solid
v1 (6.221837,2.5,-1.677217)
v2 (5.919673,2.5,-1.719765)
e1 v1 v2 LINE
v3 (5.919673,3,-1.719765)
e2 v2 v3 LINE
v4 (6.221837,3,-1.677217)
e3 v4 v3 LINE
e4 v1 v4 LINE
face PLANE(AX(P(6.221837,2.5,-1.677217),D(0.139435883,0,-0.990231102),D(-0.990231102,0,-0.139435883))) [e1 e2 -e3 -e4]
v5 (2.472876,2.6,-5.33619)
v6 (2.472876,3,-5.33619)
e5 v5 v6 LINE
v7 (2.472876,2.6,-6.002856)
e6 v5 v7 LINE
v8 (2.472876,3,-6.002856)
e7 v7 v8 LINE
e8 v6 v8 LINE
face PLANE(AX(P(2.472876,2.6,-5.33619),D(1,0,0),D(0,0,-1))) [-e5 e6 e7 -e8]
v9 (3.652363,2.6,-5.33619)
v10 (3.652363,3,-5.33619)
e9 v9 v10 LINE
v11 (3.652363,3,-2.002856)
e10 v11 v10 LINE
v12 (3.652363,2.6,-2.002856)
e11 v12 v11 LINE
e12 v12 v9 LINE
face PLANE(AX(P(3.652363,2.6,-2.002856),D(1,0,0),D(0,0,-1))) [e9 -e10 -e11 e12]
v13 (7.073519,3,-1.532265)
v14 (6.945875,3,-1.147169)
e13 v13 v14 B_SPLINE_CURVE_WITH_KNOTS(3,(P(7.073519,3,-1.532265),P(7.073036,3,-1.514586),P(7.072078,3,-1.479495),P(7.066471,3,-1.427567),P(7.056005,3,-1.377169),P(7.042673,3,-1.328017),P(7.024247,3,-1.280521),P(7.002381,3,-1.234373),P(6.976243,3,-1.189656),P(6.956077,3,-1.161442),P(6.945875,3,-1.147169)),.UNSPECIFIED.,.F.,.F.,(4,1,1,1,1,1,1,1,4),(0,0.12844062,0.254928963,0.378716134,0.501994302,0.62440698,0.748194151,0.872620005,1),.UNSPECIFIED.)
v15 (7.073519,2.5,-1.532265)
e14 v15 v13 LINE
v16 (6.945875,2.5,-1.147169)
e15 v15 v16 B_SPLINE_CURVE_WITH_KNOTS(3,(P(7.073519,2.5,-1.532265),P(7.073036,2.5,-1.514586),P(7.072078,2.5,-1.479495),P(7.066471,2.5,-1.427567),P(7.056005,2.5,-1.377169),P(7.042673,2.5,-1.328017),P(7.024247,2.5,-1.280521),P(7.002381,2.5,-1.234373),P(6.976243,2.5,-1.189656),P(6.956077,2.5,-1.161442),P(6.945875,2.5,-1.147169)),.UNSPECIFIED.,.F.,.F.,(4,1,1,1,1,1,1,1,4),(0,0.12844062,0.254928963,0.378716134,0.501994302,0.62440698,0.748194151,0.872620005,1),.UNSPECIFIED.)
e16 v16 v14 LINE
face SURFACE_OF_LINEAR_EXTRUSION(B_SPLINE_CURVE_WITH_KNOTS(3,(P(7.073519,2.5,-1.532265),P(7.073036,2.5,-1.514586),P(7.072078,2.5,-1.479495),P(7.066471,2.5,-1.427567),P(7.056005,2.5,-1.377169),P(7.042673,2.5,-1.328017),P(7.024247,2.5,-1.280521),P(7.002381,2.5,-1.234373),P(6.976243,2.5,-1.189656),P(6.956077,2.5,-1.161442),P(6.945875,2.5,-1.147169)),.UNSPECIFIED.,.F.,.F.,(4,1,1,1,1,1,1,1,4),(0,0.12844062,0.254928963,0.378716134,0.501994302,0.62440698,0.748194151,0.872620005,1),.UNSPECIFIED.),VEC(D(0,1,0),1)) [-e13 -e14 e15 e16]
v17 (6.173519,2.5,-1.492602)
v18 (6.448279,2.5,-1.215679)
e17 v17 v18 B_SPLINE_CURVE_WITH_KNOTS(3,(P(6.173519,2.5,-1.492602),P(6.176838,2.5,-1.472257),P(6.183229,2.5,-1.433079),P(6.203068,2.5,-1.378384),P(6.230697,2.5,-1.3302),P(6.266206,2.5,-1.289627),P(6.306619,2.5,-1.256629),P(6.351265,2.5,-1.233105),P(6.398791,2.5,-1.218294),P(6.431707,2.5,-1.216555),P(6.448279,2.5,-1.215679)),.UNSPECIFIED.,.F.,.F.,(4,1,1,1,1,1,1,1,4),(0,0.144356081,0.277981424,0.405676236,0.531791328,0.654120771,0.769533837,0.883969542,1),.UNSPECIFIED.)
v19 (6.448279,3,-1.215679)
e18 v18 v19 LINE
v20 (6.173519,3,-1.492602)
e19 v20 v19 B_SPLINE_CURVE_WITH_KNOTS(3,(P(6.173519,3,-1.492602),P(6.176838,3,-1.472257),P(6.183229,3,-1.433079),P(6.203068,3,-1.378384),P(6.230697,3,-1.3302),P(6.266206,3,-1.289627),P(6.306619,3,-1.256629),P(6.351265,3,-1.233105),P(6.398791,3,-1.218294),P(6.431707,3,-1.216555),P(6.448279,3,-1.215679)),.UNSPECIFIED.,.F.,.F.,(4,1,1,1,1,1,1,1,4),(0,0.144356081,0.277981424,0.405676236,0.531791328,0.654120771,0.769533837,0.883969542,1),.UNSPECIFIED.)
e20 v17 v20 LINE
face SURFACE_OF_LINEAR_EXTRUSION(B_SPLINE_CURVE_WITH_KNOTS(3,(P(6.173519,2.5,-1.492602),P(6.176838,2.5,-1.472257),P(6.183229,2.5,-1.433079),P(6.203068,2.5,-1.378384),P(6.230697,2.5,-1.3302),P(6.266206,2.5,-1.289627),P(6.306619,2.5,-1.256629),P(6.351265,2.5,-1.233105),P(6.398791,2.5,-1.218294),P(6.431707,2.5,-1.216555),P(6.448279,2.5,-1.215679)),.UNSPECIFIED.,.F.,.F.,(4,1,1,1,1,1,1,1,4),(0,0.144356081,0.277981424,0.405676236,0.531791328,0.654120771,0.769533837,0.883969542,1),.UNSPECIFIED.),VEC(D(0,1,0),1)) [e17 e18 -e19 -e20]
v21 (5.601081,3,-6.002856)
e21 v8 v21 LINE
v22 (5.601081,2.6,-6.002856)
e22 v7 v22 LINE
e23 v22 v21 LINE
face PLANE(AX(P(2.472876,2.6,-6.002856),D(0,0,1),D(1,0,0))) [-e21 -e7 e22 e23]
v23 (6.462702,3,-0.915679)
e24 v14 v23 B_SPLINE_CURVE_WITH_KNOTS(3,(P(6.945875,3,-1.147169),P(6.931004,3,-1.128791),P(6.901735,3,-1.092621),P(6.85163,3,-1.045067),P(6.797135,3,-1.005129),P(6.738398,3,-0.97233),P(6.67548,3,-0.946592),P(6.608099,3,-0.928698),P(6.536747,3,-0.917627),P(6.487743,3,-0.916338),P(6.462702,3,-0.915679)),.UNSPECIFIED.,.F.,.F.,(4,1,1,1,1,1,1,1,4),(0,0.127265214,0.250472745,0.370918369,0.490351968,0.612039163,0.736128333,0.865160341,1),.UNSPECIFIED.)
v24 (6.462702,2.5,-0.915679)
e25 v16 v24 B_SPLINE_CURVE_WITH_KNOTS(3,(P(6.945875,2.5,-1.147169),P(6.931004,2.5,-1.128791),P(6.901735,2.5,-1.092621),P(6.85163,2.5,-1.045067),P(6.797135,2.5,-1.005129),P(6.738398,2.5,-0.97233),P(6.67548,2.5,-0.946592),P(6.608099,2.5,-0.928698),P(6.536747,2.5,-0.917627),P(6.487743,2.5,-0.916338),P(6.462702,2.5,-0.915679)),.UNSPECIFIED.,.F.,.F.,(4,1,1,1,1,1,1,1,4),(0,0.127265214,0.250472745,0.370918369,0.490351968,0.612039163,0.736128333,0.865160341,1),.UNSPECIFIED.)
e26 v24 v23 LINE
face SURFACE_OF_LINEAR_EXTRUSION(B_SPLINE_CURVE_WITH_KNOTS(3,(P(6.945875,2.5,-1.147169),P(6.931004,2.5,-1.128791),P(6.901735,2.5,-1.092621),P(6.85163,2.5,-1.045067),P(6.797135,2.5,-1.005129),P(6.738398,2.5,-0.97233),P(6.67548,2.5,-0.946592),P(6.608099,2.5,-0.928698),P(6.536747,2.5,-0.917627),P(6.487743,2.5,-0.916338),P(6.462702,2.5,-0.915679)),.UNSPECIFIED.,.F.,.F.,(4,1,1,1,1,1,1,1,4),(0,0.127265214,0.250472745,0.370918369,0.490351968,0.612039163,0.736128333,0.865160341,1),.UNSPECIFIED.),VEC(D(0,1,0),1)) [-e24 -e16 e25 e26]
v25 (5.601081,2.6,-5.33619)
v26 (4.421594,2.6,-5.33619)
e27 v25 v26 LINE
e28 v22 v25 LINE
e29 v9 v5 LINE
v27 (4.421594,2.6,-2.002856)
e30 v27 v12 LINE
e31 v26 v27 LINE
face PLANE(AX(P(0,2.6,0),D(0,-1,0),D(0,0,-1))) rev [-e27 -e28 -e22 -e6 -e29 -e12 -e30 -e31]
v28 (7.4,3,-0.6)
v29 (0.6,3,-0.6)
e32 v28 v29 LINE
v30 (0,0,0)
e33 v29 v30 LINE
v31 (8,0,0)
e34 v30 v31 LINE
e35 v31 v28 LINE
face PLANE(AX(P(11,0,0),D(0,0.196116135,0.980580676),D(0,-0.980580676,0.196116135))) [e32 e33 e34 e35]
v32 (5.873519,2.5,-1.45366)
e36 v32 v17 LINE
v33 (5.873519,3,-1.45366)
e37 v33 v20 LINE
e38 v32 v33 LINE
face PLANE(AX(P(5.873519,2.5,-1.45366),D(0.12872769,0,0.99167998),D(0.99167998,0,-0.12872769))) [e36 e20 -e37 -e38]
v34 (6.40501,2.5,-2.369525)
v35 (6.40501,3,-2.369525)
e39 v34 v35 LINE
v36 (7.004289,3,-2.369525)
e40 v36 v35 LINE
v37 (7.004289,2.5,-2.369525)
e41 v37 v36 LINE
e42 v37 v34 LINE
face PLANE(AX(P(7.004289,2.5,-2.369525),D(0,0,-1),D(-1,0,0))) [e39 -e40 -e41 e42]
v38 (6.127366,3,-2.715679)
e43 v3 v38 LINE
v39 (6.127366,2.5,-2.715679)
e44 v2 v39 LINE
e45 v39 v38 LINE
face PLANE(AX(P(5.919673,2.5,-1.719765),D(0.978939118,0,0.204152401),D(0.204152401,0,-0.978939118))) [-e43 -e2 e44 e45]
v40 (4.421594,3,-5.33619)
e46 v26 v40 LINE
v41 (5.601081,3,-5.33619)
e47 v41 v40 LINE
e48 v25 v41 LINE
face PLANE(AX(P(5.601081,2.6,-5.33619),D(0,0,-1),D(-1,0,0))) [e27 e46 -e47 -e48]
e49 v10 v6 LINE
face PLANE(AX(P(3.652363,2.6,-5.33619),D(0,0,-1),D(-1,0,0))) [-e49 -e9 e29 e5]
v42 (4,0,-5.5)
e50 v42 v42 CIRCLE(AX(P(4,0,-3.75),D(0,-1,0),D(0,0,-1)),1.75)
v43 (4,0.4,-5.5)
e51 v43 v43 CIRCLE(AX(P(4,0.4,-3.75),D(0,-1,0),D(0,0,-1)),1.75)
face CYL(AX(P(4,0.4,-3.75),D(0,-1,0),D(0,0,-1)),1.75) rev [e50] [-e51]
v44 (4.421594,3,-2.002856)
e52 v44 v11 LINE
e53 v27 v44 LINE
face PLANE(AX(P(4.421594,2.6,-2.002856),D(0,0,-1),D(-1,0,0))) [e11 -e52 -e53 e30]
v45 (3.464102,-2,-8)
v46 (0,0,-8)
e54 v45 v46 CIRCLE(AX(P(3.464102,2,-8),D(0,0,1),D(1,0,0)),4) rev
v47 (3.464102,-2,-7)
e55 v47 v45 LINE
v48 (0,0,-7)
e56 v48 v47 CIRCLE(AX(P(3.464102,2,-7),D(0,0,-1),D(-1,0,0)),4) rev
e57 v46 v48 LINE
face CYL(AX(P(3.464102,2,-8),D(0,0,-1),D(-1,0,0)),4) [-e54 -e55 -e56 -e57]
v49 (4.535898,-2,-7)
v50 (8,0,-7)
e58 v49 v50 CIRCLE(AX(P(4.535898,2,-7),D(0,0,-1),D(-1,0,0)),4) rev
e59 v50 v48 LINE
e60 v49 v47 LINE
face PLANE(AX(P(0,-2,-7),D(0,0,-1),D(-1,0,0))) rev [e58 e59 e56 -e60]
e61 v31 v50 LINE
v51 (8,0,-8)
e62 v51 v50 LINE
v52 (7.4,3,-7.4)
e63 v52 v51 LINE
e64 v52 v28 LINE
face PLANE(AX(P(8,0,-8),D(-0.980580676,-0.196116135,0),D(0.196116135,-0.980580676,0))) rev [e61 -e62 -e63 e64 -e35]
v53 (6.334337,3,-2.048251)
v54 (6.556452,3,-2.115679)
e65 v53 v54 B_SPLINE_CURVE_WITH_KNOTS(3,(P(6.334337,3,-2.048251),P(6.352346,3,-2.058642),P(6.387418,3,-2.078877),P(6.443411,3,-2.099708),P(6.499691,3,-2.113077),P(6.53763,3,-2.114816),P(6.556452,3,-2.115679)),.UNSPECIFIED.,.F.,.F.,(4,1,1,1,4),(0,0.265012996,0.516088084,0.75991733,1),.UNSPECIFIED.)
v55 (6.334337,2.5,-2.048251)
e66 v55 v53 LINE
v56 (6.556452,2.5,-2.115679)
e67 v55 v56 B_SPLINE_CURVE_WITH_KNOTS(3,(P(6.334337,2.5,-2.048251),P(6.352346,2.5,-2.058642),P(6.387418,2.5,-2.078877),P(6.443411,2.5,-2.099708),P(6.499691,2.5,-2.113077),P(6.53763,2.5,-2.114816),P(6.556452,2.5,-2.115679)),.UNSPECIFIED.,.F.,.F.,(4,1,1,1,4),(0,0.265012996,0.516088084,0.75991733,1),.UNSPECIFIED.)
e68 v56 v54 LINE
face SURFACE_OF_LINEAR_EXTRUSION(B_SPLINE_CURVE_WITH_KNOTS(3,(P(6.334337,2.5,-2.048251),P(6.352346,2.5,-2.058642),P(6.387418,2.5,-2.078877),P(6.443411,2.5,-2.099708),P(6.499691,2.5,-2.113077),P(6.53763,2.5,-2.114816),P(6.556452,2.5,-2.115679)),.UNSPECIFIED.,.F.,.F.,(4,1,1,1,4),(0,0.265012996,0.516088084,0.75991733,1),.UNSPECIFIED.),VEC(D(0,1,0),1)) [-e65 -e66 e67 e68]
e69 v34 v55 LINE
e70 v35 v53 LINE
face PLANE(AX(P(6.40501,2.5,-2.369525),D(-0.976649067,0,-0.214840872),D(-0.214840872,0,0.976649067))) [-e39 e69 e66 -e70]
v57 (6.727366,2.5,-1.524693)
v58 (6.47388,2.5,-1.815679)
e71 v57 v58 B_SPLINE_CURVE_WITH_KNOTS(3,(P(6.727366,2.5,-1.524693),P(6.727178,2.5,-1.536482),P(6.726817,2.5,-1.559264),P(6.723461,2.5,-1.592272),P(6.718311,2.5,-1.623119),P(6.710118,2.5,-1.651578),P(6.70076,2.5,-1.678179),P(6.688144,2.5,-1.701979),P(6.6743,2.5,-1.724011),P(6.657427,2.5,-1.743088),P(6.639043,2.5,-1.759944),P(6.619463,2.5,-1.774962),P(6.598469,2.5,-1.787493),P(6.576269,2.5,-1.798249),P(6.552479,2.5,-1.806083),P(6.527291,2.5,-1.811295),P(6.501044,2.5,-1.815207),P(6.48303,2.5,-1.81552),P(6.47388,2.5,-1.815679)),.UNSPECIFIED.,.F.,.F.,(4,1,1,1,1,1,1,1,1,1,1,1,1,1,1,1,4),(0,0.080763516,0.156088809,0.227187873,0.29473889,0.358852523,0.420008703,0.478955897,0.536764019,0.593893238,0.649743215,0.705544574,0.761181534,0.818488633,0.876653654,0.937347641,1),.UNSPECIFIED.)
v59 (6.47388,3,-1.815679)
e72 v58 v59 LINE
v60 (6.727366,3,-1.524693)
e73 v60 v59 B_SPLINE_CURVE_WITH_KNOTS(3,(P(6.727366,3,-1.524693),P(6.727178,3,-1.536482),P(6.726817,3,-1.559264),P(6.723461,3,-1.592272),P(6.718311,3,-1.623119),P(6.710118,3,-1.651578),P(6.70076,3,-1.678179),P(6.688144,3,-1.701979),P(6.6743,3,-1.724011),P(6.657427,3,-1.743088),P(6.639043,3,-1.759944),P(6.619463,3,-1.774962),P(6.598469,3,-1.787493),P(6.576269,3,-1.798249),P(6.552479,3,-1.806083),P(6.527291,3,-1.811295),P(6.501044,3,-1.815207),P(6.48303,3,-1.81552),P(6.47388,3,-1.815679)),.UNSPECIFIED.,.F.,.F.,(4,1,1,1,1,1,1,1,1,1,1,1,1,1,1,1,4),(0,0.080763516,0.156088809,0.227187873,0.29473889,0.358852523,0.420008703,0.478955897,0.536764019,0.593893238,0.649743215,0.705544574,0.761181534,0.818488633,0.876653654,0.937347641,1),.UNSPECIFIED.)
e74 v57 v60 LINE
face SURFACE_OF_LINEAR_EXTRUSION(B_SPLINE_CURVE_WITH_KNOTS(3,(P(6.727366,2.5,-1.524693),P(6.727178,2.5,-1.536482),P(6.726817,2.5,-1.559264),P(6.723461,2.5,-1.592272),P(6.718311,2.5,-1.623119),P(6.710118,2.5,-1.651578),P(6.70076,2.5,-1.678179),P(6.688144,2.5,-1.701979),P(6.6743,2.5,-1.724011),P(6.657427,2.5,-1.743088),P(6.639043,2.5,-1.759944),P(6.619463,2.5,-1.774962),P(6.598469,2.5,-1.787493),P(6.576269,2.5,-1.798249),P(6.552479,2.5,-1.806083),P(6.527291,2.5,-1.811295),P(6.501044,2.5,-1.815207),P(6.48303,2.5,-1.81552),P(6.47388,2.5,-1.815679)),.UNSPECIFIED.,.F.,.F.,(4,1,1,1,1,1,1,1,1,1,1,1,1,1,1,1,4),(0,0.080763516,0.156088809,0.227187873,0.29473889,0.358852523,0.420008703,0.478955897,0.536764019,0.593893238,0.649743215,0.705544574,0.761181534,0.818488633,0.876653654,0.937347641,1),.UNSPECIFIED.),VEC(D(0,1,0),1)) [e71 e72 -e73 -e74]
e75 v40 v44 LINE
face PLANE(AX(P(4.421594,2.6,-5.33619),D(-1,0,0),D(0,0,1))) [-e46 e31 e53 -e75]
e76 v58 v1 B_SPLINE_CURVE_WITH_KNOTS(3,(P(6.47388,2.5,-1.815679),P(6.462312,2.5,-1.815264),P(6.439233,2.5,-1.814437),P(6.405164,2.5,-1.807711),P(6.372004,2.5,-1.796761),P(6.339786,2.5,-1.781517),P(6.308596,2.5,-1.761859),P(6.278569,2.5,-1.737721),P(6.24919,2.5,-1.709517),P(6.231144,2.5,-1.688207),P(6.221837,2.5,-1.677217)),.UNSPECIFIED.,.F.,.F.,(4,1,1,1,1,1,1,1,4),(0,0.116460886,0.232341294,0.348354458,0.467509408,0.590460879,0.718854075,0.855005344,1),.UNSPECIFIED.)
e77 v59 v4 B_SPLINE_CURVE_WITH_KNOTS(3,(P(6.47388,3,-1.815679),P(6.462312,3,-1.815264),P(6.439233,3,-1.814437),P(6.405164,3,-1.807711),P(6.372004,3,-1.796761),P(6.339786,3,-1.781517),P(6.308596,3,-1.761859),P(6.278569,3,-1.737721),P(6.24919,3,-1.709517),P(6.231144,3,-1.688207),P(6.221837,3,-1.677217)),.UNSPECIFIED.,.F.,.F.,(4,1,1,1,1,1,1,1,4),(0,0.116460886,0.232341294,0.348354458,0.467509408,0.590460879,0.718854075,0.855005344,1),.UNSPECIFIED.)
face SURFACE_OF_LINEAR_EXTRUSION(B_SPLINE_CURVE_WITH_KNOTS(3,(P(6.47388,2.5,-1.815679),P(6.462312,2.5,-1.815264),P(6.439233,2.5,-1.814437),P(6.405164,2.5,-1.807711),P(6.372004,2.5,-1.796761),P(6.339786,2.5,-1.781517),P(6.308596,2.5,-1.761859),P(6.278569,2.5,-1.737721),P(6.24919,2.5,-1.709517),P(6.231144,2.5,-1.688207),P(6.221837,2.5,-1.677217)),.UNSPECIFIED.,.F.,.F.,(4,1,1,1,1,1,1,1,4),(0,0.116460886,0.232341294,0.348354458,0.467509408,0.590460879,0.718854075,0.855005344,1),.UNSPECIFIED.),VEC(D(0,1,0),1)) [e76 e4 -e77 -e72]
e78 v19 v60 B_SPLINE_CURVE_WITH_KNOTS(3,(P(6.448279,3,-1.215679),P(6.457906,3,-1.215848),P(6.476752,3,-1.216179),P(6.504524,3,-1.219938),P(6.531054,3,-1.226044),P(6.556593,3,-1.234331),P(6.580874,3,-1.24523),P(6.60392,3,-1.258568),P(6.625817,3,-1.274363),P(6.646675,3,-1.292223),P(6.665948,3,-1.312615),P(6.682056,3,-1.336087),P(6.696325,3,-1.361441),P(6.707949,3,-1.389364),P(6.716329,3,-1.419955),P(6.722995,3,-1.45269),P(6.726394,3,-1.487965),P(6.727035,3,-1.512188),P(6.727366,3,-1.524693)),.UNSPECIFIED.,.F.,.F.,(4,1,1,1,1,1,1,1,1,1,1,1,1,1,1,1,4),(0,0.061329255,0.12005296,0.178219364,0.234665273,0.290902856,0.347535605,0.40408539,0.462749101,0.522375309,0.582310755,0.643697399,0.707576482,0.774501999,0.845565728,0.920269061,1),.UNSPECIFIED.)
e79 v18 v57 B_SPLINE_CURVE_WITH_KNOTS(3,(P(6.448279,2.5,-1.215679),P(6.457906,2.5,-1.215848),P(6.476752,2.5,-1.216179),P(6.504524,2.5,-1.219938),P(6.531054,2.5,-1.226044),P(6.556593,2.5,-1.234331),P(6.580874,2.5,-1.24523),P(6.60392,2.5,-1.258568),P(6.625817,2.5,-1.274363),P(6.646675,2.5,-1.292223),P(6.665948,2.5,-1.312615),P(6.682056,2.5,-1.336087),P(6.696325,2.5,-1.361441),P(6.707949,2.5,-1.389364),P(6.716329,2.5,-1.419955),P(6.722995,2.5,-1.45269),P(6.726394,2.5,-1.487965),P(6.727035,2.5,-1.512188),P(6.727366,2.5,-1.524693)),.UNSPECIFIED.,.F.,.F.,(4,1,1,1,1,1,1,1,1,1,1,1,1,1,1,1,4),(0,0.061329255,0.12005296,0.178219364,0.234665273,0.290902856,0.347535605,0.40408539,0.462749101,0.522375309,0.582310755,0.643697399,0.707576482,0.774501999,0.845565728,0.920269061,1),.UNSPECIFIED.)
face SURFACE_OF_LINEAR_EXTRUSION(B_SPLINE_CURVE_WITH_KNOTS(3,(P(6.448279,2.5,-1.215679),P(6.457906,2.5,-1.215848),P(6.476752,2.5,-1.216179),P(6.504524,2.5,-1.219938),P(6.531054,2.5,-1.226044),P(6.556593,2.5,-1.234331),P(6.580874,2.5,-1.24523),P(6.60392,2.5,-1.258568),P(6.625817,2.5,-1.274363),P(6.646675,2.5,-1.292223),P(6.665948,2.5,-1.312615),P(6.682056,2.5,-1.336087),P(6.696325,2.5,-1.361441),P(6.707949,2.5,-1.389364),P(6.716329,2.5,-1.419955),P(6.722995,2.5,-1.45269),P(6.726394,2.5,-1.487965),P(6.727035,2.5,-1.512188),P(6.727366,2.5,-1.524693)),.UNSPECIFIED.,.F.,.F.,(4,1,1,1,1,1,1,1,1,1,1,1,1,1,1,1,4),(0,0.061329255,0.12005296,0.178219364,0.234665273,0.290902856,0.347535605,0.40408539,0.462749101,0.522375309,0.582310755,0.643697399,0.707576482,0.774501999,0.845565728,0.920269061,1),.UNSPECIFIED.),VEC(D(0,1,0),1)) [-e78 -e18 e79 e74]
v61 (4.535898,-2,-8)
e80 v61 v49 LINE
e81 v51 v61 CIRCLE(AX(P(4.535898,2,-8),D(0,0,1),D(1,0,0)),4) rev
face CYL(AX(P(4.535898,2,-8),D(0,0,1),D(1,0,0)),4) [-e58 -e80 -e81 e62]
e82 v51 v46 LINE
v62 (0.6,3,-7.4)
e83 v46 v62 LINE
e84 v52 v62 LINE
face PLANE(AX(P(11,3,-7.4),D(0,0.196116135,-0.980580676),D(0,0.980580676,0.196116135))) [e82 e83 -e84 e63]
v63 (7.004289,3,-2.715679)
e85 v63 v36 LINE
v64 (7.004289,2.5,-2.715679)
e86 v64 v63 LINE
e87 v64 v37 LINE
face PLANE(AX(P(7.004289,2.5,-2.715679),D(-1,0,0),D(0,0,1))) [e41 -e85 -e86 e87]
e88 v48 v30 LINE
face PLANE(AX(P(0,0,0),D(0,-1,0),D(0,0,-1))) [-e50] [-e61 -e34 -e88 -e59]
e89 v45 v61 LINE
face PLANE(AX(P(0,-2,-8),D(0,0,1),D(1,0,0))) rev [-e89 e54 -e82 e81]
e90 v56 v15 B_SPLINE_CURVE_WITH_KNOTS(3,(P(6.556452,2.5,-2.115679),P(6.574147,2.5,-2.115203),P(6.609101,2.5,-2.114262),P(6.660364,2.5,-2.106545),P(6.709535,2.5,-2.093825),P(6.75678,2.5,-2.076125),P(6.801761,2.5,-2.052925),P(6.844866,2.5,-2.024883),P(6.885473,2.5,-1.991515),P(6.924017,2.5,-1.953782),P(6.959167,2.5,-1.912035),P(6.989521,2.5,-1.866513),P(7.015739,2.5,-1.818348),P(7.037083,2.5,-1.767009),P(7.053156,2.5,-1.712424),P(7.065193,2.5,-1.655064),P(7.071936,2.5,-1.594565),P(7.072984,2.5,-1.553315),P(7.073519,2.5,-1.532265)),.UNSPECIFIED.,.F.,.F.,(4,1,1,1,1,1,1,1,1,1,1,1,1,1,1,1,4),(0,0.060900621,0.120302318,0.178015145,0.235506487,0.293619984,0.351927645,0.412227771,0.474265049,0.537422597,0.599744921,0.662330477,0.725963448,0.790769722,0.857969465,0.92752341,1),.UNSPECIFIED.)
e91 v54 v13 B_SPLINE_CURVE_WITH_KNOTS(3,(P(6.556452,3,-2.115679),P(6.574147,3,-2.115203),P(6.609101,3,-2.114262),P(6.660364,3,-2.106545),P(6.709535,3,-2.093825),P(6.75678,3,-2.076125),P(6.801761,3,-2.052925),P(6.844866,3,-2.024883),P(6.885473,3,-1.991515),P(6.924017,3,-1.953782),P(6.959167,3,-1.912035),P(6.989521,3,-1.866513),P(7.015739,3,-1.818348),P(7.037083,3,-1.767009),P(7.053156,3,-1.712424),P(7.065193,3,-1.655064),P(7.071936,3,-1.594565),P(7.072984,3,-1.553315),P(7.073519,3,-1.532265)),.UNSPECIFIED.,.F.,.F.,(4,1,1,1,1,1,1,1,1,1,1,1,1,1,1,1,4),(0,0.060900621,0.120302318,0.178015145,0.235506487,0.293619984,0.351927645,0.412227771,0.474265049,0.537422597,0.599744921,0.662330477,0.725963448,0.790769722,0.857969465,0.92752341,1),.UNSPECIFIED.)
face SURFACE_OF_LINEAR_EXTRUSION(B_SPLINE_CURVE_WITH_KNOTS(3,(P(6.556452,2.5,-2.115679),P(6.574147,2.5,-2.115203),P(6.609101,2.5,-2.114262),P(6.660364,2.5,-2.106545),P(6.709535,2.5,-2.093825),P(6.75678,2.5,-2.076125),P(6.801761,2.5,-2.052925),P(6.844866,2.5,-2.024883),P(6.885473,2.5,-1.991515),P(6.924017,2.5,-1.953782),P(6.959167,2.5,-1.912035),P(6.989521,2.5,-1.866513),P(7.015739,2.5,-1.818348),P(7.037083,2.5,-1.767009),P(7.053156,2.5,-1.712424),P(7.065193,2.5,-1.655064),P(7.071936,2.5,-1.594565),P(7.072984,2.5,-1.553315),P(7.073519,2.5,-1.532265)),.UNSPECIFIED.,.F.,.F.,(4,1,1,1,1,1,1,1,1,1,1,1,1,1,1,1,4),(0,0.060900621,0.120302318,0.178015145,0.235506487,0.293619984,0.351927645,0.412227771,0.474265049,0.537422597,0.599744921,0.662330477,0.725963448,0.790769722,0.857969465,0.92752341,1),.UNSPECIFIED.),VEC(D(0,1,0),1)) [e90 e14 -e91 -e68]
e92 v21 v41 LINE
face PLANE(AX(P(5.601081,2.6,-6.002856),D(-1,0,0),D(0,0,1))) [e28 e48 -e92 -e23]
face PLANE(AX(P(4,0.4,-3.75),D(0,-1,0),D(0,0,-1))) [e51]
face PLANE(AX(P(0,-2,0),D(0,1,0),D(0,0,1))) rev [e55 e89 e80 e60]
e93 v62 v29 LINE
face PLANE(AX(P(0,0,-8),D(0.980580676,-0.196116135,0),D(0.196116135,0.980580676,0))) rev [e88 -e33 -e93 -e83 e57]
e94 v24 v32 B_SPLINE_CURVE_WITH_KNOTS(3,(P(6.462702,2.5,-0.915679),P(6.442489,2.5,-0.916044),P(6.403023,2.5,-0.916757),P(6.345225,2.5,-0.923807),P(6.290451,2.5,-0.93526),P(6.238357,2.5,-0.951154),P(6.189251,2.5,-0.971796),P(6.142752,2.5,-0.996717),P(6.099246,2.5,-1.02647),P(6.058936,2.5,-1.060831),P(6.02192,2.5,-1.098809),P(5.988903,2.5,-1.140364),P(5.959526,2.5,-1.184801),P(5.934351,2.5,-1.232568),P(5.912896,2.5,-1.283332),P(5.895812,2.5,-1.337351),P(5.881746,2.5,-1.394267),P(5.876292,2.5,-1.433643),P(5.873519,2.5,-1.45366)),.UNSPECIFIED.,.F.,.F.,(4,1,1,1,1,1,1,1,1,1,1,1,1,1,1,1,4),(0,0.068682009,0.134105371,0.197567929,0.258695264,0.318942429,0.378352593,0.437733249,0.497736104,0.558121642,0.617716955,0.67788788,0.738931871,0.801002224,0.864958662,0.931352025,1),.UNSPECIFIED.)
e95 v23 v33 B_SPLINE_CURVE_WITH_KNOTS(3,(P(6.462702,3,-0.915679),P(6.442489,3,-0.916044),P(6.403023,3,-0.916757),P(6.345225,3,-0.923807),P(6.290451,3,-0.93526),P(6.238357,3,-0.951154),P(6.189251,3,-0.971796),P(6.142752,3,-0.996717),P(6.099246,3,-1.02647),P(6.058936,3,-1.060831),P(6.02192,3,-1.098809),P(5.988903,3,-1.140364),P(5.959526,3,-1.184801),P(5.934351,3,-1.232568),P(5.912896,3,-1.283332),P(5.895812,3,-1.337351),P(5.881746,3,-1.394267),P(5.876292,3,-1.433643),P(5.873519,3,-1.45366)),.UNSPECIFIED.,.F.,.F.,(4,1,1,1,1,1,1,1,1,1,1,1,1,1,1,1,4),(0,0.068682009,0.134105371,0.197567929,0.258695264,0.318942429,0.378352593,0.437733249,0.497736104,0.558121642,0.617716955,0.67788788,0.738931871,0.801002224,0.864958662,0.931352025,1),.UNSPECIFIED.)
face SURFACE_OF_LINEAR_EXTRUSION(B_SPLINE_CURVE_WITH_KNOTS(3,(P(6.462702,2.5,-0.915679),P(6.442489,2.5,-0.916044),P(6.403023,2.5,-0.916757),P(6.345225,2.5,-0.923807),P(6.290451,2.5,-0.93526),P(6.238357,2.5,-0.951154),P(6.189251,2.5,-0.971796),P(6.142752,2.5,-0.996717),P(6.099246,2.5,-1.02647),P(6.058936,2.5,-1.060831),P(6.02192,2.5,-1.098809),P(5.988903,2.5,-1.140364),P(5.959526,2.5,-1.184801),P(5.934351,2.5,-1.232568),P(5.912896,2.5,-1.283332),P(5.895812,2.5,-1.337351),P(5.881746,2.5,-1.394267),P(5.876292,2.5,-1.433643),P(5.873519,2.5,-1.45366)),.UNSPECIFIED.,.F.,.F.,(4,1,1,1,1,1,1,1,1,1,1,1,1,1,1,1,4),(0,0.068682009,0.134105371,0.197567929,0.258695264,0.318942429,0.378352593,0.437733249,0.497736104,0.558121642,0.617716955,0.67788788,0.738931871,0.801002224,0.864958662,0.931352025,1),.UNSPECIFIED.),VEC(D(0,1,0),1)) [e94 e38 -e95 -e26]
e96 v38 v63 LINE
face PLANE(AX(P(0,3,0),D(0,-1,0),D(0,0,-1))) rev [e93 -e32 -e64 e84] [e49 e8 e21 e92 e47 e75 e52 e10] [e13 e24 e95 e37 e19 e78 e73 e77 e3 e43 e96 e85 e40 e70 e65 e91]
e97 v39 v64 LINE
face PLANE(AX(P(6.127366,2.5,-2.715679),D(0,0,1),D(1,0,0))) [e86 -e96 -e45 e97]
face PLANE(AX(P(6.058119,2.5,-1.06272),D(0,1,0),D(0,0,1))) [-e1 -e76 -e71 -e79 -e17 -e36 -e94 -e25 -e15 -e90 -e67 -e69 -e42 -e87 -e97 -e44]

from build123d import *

# Parameters (mm, degrees)
SKETCH1_W               = 8
SKETCH1_H               = 8
BOSS_EXTRUDE1_DEPTH     = 3
CUT_EXTRUDE1_DEPTH      = 12.704699911
CUT_EXTRUDE1_DEPTH_BACK = 12.704699911
CUT_EXTRUDE2_DEPTH      = 11
SKETCH4_R               = 1.75
CUT_EXTRUDE3_DEPTH      = 0.4
SKETCH5_W               = 8
SKETCH5_H               = 1
BOSS_EXTRUDE2_DEPTH     = 2
FILLET1_R               = 4
CUT_EXTRUDE4_DEPTH      = 0.4
CUT_EXTRUDE5_DEPTH      = 0.5


with BuildPart() as part:
    # Sketch1 → Boss-Extrude1 (new body)
    with BuildSketch(Plane(origin=(0, 0, 0), x_dir=(1, 0, 0), z_dir=(0, 1, 0))):
        with Locations((4, 4)):
            Rectangle(SKETCH1_W, SKETCH1_H)
    extrude(amount=BOSS_EXTRUDE1_DEPTH)

    # Sketch2 → Cut-Extrude1 (cut, two sides: drawn at the far end of the back side and taken through both)
    with BuildSketch(Plane.XY.offset(-CUT_EXTRUDE1_DEPTH_BACK)):
        Polygon((0, 0), (0.6, 3), (0, 3), align=None)
        Polygon((8, 0), (7.4, 3), (8, 3), align=None)
    extrude(amount=CUT_EXTRUDE1_DEPTH + CUT_EXTRUDE1_DEPTH_BACK, mode=Mode.SUBTRACT)

    # Sketch3 → Cut-Extrude2 (cut)
    with BuildSketch(Plane(origin=(0, 0, 0), x_dir=(0, 0, -1), z_dir=(1, 0, 0))):
        Polygon((0, 0), (0.6, 3), (0, 3), align=None)
        Polygon((8, 3), (7.4, 3), (8, 0), align=None)
    extrude(amount=CUT_EXTRUDE2_DEPTH, mode=Mode.SUBTRACT)

    # Sketch4 → Cut-Extrude3 (cut)
    with BuildSketch(Plane.XZ):
        with Locations(Location((4, -3.75, 0), (0, 0, 270))):
            Circle(SKETCH4_R)
    extrude(amount=-CUT_EXTRUDE3_DEPTH, mode=Mode.SUBTRACT)

    # Sketch5 → Boss-Extrude2 (add)
    with BuildSketch(Plane.XZ):
        with Locations((4, -7.5)):
            Rectangle(SKETCH5_W, SKETCH5_H)
    extrude(amount=BOSS_EXTRUDE2_DEPTH)

    # Fillet1
    # the kernel refuses this fillet: 4 mm, written as the material it takes off along each edge
    with BuildSketch(Plane(origin=(8, -2, -16.660254038), x_dir=(0, 1, 0), z_dir=(0, 0, 1)), Plane(origin=(0, -2, 1.660254038), x_dir=(0, 1, 0), z_dir=(0, 0, -1))) as fillet1_piece_1:
        with BuildLine():
            CenterArc((4, 3.464101615), FILLET1_R, 180, 60)
            Line((0, 3.464101615), (-0.08, 3.464101615))
            Line((-0.08, 3.464101615), (-0.08, 0))
            Line((-0.08, 0), (0, -0.08))
            ThreePointArc((0, -0.08), (1, -0.08), (1.96, -0.069282032))
            Line((1.96, -0.069282032), (2, 0))
        make_face()
    extrude(amount=18.320508076, mode=Mode.SUBTRACT)

    # Sketch6 → Cut-Extrude4 (cut)
    with BuildSketch(Plane(origin=(0, 3, 0), x_dir=(1, 0, 0), z_dir=(0, 1, 0))):
        Polygon((3.652362984, 2.002856352), (3.652362984, 5.336189685), (2.472875805, 5.336189685), (2.472875805, 6.002856352), (5.601080933, 6.002856352), (5.601080933, 5.336189685), (4.421593754, 5.336189685), (4.421593754, 2.002856352), align=None)
    extrude(amount=-CUT_EXTRUDE4_DEPTH, mode=Mode.SUBTRACT)

    # Sketch7 → Cut-Extrude5 (cut)
    with BuildSketch(Plane(origin=(0, 3, 0), x_dir=(1, 0, 0), z_dir=(0, 1, 0))):
        with BuildLine():
            Line((5.873519392, 1.453659702), (6.173519392, 1.492602009))
            add(Edge.make_bspline(
                [(6.173519392, 1.492602009), (6.1768382, 1.472256976), (6.18322911, 1.433079261), (6.203068429, 1.378384162), (6.230697403, 1.330199963), (6.266205672, 1.289626965), (6.30661854, 1.256629271), (6.351264588, 1.233104776), (6.398791495, 1.218293755), (6.431707248, 1.216554551), (6.448279008, 1.215678932)],
                knots=[0, 0, 0, 0, 1.154848647, 2.223851388, 3.245409892, 4.254330626, 5.232966172, 6.156270698, 7.071756339, 8, 8, 8, 8], degree=3))
            add(Edge.make_bspline(
                [(6.448279008, 1.215678932), (6.457906388, 1.215848075), (6.476752132, 1.216179174), (6.504524052, 1.219937575), (6.531053869, 1.226043662), (6.55659259, 1.234330756), (6.580874213, 1.245230043), (6.603920328, 1.258567919), (6.625817059, 1.274363121), (6.646675237, 1.292223374), (6.665948362, 1.312615024), (6.682055884, 1.336087325), (6.696325112, 1.361440746), (6.707949377, 1.389364059), (6.716328852, 1.41995512), (6.722995329, 1.45269023), (6.726393576, 1.487964606), (6.7270346, 1.51218758), (6.727365546, 1.524693355)],
                knots=[0, 0, 0, 0, 0.981268084, 1.920847364, 2.851509818, 3.754644372, 4.654445699, 5.560569672, 6.465366234, 7.403985617, 8.358004942, 9.316972086, 10.299158387, 11.321223707, 12.392031981, 13.529051644, 14.724304971, 16, 16, 16, 16], degree=3))
            add(Edge.make_bspline(
                [(6.727365546, 1.524693355), (6.727178419, 1.536481523), (6.726816764, 1.559264099), (6.723461454, 1.592272205), (6.718311073, 1.623118586), (6.710117629, 1.651577708), (6.700760071, 1.678178631), (6.688143723, 1.701978526), (6.674300374, 1.724011312), (6.657427434, 1.743088207), (6.639042824, 1.759943867), (6.619463278, 1.774961982), (6.598469004, 1.787493154), (6.576269045, 1.79824857), (6.552478567, 1.806082762), (6.527290541, 1.811294815), (6.501043648, 1.815207497), (6.483029864, 1.815520133), (6.473879969, 1.815678932)],
                knots=[0, 0, 0, 0, 1.29221626, 2.497420946, 3.635005972, 4.715822244, 5.741640361, 6.720139245, 7.663294346, 8.588224307, 9.502291809, 10.395891443, 11.288713187, 12.178904539, 13.095818132, 14.026458458, 14.997562253, 16, 16, 16, 16], degree=3))
            add(Edge.make_bspline(
                [(6.473879969, 1.815678932), (6.462311673, 1.815264192), (6.439232742, 1.814436778), (6.405164091, 1.807710713), (6.372003678, 1.796760631), (6.339785969, 1.781517356), (6.308596201, 1.761859078), (6.278569411, 1.737720606), (6.249190173, 1.70951724), (6.23114374, 1.688207441), (6.2218367, 1.677217394)],
                knots=[0, 0, 0, 0, 0.931687088, 1.85873035, 2.786835662, 3.740075265, 4.723687035, 5.750832598, 6.840042753, 8, 8, 8, 8], degree=3))
            Line((6.2218367, 1.677217394), (5.919673238, 1.719765471))
            Line((5.919673238, 1.719765471), (6.127365546, 2.715678932))
            Line((6.127365546, 2.715678932), (7.004288623, 2.715678932))
            Line((7.004288623, 2.715678932), (7.004288623, 2.369525086))
            Line((7.004288623, 2.369525086), (6.405009777, 2.369525086))
            Line((6.405009777, 2.369525086), (6.3343367, 2.048251048))
            add(Edge.make_bspline(
                [(6.3343367, 2.048251048), (6.352346227, 2.058641979), (6.3874181, 2.078877348), (6.443410579, 2.099707804), (6.499690691, 2.113077126), (6.537629531, 2.114816152), (6.556452085, 2.115678932)],
                knots=[0, 0, 0, 0, 1.060051984, 2.064352337, 3.039669322, 4, 4, 4, 4], degree=3))
            add(Edge.make_bspline(
                [(6.556452085, 2.115678932), (6.574146885, 2.115202759), (6.60910097, 2.114262131), (6.660364054, 2.106544582), (6.709535097, 2.093825268), (6.756780138, 2.076125011), (6.801761249, 2.052924592), (6.844866196, 2.024883357), (6.885472675, 1.991514713), (6.924016987, 1.953782044), (6.959166694, 1.912035385), (6.989521263, 1.866512768), (7.015738821, 1.818347997), (7.037083021, 1.767008911), (7.053155816, 1.712424088), (7.065192785, 1.655063547), (7.07193581, 1.594565079), (7.072984339, 1.553314949), (7.073519392, 1.532265471)],
                knots=[0, 0, 0, 0, 0.974409932, 1.924837087, 2.848242317, 3.768103797, 4.697919751, 5.630842317, 6.595644344, 7.588240789, 8.59876155, 9.595918743, 10.597287627, 11.615415169, 12.652315553, 13.727511434, 14.840374562, 16, 16, 16, 16], degree=3))
            add(Edge.make_bspline(
                [(7.073519392, 1.532265471), (7.073036469, 1.514585649), (7.072077961, 1.479494734), (7.066471429, 1.42756738), (7.056005109, 1.377169317), (7.042672536, 1.328016631), (7.024246745, 1.280521142), (7.002381003, 1.234373213), (6.976242653, 1.189655711), (6.956076521, 1.161441782), (6.945875162, 1.147169317)],
                knots=[0, 0, 0, 0, 1.027524957, 2.039431707, 3.02972907, 4.015954419, 4.995255842, 5.985553205, 6.980960039, 8, 8, 8, 8], degree=3))
            add(Edge.make_bspline(
                [(6.945875162, 1.147169317), (6.931003624, 1.128791302), (6.901734709, 1.092621232), (6.851630217, 1.045066578), (6.797135444, 1.00512898), (6.738397987, 0.97233011), (6.675480422, 0.946591981), (6.608098871, 0.928697649), (6.536747385, 0.917626673), (6.487743367, 0.916337636), (6.462702085, 0.915678932)],
                knots=[0, 0, 0, 0, 1.018121711, 2.003781959, 2.967346956, 3.92281574, 4.896313303, 5.889026666, 6.921282725, 8, 8, 8, 8], degree=3))
            add(Edge.make_bspline(
                [(6.462702085, 0.915678932), (6.442489279, 0.916044029), (6.403022672, 0.9167569), (6.345224712, 0.92380666), (6.290451314, 0.935259909), (6.238356922, 0.95115359), (6.18925085, 0.971795666), (6.142751555, 0.99671717), (6.099246456, 1.026470486), (6.058935891, 1.060830838), (6.021919655, 1.09880899), (5.988902802, 1.140363971), (5.959526451, 1.184800784), (5.934351052, 1.232568443), (5.912895663, 1.28333195), (5.895811978, 1.337351468), (5.881746134, 1.394266746), (5.876291993, 1.433642912), (5.873519392, 1.453659702)],
                knots=[0, 0, 0, 0, 1.098912142, 2.145685936, 3.161086862, 4.139124218, 5.10307886, 6.053641493, 7.003731987, 7.963777669, 8.929946266, 9.883471279, 10.846206077, 11.822909928, 12.81603559, 13.839338588, 14.901632394, 16, 16, 16, 16], degree=3))
        make_face()
    extrude(amount=-CUT_EXTRUDE5_DEPTH, mode=Mode.SUBTRACT)


solid = part.part
